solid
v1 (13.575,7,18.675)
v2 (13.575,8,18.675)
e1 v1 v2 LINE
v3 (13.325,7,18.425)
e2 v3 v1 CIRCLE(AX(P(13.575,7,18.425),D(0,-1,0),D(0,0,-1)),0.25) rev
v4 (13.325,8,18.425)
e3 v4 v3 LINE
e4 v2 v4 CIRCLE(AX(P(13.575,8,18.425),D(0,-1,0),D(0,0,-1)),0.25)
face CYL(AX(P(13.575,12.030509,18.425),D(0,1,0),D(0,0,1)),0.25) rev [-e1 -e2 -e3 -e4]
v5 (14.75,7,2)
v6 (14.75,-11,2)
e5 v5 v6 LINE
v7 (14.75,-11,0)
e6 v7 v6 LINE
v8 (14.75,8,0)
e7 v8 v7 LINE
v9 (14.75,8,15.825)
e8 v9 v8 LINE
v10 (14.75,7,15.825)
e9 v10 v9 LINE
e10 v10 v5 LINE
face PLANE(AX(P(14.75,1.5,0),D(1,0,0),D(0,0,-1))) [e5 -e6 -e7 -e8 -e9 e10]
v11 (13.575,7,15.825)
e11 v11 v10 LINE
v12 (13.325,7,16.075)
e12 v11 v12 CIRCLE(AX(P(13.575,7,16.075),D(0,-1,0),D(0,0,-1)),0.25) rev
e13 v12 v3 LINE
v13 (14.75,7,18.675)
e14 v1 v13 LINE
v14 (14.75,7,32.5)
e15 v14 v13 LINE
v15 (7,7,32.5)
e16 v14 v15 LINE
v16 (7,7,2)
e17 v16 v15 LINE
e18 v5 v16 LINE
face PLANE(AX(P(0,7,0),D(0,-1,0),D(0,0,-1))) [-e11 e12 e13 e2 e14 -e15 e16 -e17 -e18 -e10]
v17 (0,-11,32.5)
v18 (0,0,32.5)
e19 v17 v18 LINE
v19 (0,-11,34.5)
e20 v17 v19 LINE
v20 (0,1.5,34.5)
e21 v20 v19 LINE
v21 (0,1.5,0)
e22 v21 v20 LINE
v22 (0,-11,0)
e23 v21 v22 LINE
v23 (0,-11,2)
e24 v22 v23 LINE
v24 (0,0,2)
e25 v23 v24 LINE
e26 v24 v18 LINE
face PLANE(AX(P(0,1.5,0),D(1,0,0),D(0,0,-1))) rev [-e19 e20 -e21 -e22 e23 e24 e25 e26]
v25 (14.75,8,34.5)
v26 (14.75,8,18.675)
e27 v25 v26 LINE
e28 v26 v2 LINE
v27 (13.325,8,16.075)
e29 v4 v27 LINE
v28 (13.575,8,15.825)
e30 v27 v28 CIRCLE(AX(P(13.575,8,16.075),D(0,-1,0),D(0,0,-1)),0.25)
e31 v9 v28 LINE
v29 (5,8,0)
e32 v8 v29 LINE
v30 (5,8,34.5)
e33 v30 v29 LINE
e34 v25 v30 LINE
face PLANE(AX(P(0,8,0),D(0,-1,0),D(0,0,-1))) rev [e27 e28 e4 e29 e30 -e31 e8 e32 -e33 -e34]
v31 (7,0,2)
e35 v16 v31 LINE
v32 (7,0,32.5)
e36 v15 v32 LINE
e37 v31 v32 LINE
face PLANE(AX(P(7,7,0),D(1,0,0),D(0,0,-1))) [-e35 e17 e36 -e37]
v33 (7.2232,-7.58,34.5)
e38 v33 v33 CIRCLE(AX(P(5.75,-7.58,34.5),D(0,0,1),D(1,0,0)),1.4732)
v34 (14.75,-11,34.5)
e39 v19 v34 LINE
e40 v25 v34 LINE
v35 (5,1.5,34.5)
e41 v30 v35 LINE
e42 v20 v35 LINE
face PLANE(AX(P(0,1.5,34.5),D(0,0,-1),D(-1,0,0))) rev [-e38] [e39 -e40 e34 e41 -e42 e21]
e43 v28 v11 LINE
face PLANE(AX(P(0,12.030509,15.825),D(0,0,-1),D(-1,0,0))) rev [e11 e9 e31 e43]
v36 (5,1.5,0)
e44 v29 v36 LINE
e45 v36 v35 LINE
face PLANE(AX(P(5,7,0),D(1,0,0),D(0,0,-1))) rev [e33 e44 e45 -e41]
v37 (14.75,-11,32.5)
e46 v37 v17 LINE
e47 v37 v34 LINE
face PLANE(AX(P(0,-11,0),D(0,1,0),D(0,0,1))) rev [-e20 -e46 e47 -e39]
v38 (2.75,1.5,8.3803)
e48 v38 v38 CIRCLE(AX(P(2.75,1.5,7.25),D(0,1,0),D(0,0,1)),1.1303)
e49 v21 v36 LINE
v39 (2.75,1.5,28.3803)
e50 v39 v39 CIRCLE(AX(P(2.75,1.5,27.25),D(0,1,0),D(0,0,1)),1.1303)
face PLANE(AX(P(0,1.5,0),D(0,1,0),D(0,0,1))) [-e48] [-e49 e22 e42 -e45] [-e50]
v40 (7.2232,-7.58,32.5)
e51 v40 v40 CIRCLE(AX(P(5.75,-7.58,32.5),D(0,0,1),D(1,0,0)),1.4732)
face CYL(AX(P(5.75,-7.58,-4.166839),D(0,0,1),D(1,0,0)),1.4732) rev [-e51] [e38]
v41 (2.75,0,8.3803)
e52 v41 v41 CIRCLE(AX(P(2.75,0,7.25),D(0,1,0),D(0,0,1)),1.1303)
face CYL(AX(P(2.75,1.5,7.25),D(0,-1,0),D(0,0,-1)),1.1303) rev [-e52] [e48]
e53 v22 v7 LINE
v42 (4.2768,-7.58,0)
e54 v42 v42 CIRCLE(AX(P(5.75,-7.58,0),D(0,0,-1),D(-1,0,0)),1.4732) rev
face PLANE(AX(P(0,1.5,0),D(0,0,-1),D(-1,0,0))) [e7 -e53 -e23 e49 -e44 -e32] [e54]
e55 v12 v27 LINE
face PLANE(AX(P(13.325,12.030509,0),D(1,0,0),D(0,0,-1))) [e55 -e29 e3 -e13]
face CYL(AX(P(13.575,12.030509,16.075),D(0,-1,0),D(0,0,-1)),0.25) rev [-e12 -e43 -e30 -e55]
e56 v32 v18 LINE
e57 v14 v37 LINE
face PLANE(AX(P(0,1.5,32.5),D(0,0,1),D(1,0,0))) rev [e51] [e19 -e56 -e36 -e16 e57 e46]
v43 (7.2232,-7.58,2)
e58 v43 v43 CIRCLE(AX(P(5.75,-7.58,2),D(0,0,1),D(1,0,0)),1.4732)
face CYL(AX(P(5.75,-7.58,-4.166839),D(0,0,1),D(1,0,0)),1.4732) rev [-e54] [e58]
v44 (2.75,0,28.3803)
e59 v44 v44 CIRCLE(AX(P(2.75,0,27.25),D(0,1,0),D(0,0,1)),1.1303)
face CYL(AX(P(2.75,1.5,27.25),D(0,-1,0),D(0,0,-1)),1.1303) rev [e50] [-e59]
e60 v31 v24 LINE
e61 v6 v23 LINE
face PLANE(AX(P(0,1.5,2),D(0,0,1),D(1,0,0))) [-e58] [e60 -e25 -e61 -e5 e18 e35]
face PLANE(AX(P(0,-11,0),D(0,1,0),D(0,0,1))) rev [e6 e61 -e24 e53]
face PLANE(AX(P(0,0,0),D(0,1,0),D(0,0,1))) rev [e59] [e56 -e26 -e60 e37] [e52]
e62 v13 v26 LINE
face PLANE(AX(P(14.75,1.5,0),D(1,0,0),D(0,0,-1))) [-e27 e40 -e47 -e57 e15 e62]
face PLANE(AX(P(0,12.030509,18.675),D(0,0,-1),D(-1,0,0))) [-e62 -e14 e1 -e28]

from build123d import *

# Parameters (mm, degrees)
SKETCH1_R                    = 1.1303
BASE_DEPTH                   = 1.5
SKETCH1_4_W                  = 14.75
SKETCH1_4_H                  = 2
BOTTOM_WALLS_DEPTH           = 11
F_4_40_CLOSE_FIT_CLEAR_REACH = 41.1
SKETCH2_R                    = 1.4732
SKETCH1_8_W                  = 2
SKETCH1_8_H                  = 30.5
MIDDLE_WALLS_DEPTH           = 7
ROOF_START                   = 7
ROOF_OUTLINE_W               = 9.75
ROOF_OUTLINE_H               = 34.5
ROOF_DEPTH                   = 1
SKETCH1_5_W                  = 1.425
SKETCH1_5_H                  = 2.85
CUT_EXTRUDE2_DEPTH           = 8
FILLET1_R                    = 0.25


# Read off the part's stored shape, not the designer's step: Roof
with BuildPart() as part:
    # Sketch1 → Base (new body)
    with BuildSketch(Plane(origin=(0, 0, 0), x_dir=(1, 0, 0), z_dir=(0, 1, 0))):
        Polygon((5, -2), (14.75, -2), (14.75, 0), (0, 0), (0, -34.5), (14.75, -34.5), (14.75, -32.5), (5, -32.5), align=None)
        with Locations(Location((2.75, -7.25, 0), (0, 0, 270))):
            Circle(SKETCH1_R, mode=Mode.SUBTRACT)
        with Locations(Location((2.75, -27.25, 0), (0, 0, 270))):
            Circle(SKETCH1_R, mode=Mode.SUBTRACT)
    extrude(amount=BASE_DEPTH)

    # Sketch1<4> → Bottom Walls (add)
    with BuildSketch(Plane(origin=(0, 0, 0), x_dir=(1, 0, 0), z_dir=(0, 1, 0))):
        with Locations((7.375, -1)):
            Rectangle(SKETCH1_4_W, SKETCH1_4_H)
        with Locations((7.375, -33.5)):
            Rectangle(SKETCH1_4_W, SKETCH1_4_H)
    extrude(amount=-BOTTOM_WALLS_DEPTH)

    # 4-40_Close_fit Clear: up to this face of the body (flat: up to its plane)
    f_4_40_close_fit_clear_end = Plane(part.part.faces().sort_by_distance((7.375, -4.75, 0))[0])
    # Sketch2 → 4-40_Close_fit Clear (cut, up to the picked face)
    with BuildSketch(Plane.XY.offset(34.5), mode=Mode.PRIVATE) as f_4_40_close_fit_clear_sk1:
        with Locations((5.75, -7.58)):
            Circle(SKETCH2_R)
    f_4_40_close_fit_clear_tool1 = split(extrude(f_4_40_close_fit_clear_sk1.sketch, amount=-F_4_40_CLOSE_FIT_CLEAR_REACH, mode=Mode.PRIVATE), bisect_by=f_4_40_close_fit_clear_end, keep=Keep.BOTH, mode=Mode.PRIVATE)
    add(f_4_40_close_fit_clear_tool1.solids().sort_by(Axis((5.75, -7.58, 34.5), (0, 0, -1)))[0], mode=Mode.SUBTRACT)

    # Sketch1<8> → Middle Walls (add)
    with BuildSketch(Plane(origin=(0, 0, 0), x_dir=(1, 0, 0), z_dir=(0, 1, 0))):
        Polygon((5, -2), (7, -2), (12.75, -2), (14.75, -2), (14.75, 0), (5, 0), align=None)
        with Locations((6, -17.25)):
            Rectangle(SKETCH1_8_W, SKETCH1_8_H)
        Polygon((12.75, -32.5), (7, -32.5), (5, -32.5), (5, -34.5), (14.75, -34.5), (14.75, -32.5), align=None)
    extrude(amount=MIDDLE_WALLS_DEPTH)

    # Roof outline → Roof (add)
    with BuildSketch(Plane(origin=(0, 0, 0), x_dir=(1, 0, 0), z_dir=(0, 1, 0)).offset(ROOF_START)):
        with Locations((9.875, -17.25)):
            Rectangle(ROOF_OUTLINE_W, ROOF_OUTLINE_H)
    extrude(amount=ROOF_DEPTH)

    # Sketch1<5> → Cut-Extrude2 (cut)
    with BuildSketch(Plane(origin=(0, 0, 0), x_dir=(1, 0, 0), z_dir=(0, 1, 0))):
        with Locations((14.0375, -17.25)):
            Rectangle(SKETCH1_5_W, SKETCH1_5_H)
        with Locations((15.4625, -17.25)):
            Rectangle(SKETCH1_5_W, SKETCH1_5_H)
    extrude(amount=CUT_EXTRUDE2_DEPTH, mode=Mode.SUBTRACT)

    # Fillet1
    fillet1_edges = [part.edges().sort_by_distance(p)[0] for p in [
        (13.325, 7.5, 15.825),
        (13.325, 7.5, 18.675),
    ]]
    fillet(fillet1_edges, radius=FILLET1_R)


solid = part.part
